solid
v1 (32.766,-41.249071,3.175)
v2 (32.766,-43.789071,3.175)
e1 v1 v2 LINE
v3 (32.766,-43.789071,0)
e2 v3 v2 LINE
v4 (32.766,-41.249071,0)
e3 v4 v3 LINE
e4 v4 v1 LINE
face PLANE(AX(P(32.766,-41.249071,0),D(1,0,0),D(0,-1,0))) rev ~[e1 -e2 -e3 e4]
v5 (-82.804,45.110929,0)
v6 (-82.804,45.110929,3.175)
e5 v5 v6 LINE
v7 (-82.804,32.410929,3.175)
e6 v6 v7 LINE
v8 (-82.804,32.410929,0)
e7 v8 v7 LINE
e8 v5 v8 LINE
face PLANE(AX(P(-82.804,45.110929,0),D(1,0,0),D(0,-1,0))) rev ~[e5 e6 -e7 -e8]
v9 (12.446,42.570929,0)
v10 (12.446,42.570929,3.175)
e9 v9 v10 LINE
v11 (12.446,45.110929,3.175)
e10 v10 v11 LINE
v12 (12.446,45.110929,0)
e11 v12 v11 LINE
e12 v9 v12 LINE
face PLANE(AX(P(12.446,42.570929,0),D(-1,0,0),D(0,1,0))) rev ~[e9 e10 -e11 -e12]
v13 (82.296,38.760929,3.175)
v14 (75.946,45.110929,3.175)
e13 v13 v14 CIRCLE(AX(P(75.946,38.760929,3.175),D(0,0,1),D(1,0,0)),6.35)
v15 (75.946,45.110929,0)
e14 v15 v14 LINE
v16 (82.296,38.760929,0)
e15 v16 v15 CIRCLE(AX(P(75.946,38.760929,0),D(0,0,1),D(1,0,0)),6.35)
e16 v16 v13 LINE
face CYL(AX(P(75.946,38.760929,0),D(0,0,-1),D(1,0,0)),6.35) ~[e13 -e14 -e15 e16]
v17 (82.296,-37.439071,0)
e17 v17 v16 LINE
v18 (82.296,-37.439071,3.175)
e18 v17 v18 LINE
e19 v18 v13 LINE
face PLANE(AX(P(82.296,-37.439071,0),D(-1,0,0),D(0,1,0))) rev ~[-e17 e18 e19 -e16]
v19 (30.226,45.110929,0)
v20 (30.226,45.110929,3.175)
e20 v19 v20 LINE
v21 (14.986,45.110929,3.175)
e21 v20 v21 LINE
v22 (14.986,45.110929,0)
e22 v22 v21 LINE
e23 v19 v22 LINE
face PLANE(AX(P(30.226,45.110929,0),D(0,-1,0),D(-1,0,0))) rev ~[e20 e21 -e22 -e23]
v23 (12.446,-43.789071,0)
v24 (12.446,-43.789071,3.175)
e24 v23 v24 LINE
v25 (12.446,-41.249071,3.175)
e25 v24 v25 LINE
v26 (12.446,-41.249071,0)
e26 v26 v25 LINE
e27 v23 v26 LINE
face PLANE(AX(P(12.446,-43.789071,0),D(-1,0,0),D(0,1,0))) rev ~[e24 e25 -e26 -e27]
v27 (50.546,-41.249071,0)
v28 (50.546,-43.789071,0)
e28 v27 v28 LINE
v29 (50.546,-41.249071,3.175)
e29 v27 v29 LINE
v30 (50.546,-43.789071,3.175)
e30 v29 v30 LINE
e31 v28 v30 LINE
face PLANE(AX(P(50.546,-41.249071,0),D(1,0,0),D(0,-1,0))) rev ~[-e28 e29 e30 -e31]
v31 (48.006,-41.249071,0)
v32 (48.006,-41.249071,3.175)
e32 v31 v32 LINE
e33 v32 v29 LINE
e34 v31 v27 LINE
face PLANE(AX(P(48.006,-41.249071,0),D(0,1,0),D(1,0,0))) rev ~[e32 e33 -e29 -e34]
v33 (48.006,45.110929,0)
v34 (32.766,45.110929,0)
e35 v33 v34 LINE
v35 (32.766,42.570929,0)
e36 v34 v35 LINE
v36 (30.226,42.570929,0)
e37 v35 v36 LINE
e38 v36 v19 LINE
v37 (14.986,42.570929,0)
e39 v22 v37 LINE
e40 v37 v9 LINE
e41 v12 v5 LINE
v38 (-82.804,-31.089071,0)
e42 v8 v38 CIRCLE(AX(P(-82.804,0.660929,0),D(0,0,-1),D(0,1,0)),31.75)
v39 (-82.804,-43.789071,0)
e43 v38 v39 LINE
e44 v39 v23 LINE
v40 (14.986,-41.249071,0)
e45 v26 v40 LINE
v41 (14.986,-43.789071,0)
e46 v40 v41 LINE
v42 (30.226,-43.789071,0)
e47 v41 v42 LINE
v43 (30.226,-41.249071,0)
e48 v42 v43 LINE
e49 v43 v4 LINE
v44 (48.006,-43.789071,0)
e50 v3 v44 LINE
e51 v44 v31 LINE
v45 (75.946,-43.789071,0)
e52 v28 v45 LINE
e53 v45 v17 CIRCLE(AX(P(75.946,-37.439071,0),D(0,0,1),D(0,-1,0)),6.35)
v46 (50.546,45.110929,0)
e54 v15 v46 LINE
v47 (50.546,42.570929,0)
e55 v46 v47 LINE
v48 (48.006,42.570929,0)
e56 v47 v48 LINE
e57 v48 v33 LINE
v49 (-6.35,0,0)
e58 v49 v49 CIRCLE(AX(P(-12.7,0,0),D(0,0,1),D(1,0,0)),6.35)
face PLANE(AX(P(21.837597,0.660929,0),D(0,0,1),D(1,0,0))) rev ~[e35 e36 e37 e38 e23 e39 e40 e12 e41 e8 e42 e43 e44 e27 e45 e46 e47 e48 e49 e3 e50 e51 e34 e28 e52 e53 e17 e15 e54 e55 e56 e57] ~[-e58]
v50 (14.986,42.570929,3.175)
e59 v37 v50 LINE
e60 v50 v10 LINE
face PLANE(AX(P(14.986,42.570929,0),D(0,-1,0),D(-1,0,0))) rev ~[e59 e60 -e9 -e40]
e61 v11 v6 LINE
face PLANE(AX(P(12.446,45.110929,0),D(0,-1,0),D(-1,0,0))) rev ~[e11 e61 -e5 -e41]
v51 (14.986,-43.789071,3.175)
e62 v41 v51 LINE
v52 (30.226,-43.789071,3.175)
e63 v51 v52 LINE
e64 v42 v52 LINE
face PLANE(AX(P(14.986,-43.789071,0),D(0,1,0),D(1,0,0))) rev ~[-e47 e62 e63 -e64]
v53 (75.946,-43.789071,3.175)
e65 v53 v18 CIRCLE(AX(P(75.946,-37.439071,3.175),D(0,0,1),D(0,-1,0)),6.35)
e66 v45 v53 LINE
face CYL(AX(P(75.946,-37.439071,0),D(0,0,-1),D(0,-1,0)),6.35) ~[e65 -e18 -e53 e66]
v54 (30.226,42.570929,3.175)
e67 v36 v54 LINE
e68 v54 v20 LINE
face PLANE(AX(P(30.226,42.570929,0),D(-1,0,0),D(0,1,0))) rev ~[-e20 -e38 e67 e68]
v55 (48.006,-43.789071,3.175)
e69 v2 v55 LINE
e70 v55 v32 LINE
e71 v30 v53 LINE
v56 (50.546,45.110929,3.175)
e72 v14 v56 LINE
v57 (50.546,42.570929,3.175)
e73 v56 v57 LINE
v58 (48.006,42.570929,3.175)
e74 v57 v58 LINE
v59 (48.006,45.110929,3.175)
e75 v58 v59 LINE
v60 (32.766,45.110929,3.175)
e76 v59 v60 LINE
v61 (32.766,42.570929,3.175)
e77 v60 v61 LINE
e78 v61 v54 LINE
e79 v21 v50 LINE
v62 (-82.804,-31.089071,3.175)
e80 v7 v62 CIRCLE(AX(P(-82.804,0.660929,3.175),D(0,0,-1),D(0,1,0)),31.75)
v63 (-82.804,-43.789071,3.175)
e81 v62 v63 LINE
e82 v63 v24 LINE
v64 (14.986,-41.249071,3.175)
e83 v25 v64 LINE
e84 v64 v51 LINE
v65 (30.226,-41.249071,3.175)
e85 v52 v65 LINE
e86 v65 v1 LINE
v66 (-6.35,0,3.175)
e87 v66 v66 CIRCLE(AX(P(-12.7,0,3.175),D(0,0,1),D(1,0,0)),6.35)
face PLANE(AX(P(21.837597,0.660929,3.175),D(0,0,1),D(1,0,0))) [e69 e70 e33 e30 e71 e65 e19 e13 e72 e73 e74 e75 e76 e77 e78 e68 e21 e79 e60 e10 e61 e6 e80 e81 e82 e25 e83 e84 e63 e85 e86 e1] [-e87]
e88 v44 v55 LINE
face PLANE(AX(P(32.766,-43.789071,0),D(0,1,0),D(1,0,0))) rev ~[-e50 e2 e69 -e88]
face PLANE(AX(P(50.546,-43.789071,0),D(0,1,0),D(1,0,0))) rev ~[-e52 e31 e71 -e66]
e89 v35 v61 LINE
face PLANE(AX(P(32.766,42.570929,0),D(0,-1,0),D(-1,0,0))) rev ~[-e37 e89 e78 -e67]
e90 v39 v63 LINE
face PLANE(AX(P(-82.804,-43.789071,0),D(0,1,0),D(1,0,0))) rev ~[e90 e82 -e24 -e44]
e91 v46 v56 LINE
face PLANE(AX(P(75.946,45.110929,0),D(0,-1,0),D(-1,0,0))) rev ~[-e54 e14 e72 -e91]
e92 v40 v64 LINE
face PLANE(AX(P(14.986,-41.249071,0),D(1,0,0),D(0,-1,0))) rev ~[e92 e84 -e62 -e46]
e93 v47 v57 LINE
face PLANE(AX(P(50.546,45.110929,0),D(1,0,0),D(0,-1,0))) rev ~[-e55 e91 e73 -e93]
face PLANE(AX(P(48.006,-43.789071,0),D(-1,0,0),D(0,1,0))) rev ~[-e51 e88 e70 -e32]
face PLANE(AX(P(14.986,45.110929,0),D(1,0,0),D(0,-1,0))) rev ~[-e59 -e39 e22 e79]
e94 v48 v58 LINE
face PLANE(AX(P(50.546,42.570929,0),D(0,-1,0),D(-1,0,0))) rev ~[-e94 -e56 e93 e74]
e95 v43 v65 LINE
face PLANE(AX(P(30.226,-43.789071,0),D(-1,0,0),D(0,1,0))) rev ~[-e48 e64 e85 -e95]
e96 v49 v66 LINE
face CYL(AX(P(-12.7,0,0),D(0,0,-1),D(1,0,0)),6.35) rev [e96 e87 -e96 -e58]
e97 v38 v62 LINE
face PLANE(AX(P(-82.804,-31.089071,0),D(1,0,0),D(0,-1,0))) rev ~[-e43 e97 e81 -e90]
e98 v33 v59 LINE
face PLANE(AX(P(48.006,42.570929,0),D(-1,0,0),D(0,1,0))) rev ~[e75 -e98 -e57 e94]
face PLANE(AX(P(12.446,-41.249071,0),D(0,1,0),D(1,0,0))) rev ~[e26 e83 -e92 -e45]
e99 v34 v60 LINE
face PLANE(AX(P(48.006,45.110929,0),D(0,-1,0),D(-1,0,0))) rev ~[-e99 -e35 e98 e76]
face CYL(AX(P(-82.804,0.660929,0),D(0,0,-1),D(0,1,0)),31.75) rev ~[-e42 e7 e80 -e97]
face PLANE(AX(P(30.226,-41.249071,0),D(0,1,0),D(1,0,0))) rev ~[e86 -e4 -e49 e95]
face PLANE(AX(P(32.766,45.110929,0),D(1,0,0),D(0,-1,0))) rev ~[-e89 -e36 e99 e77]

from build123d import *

# Parameters (mm, degrees)
F0_R     = 6.35
F1_DEPTH = 3.175


# Not quite as in the source:
# - a feature names something its author has since deleted; it is built from what else it names


with BuildPart() as f1:
    # F0 (on Top) → F1 (new body)
    with BuildSketch(Plane.XY):
        with BuildLine():
            Line((50.546, -43.7890713215), (75.946, -43.7890713215))
            ThreePointArc((75.946, -43.7890713215), (80.4361280605, -41.929199382), (82.296, -37.4390713215))
            Line((82.296, -37.4390713215), (82.296, 38.7609286785))
            ThreePointArc((82.296, 38.7609286785), (80.4361280605, 43.251056739), (75.946, 45.1109286785))
            Line((75.946, 45.1109286785), (50.546, 45.1109286785))
            Line((50.546, 45.1109286785), (50.546, 42.5709286785))
            Line((50.546, 42.5709286785), (48.006, 42.5709286785))
            Line((48.006, 42.5709286785), (48.006, 45.1109286785))
            Line((48.006, 45.1109286785), (32.766, 45.1109286785))
            Line((32.766, 45.1109286785), (32.766, 42.5709286785))
            Line((32.766, 42.5709286785), (30.226, 42.5709286785))
            Line((30.226, 42.5709286785), (30.226, 45.1109286785))
            Line((30.226, 45.1109286785), (14.986, 45.1109286785))
            Line((14.986, 45.1109286785), (14.986, 42.5709286785))
            Line((14.986, 42.5709286785), (12.446, 42.5709286785))
            Line((12.446, 42.5709286785), (12.446, 45.1109286785))
            Line((12.446, 45.1109286785), (-38.354, 45.1109286785))
            Line((-38.354, 45.1109286785), (-38.354, -43.7890713215))
            Line((-38.354, -43.7890713215), (12.446, -43.7890713215))
            Line((12.446, -43.7890713215), (12.446, -41.2490713215))
            Line((12.446, -41.2490713215), (14.986, -41.2490713215))
            Line((14.986, -41.2490713215), (14.986, -43.7890713215))
            Line((14.986, -43.7890713215), (30.226, -43.7890713215))
            Line((30.226, -43.7890713215), (30.226, -41.2490713215))
            Line((30.226, -41.2490713215), (32.766, -41.2490713215))
            Line((32.766, -41.2490713215), (32.766, -43.7890713215))
            Line((32.766, -43.7890713215), (48.006, -43.7890713215))
            Line((48.006, -43.7890713215), (48.006, -41.2490713215))
            Line((48.006, -41.2490713215), (50.546, -41.2490713215))
            Line((50.546, -41.2490713215), (50.546, -43.7890713215))
        make_face()
        with Locations((-12.7, 0)):
            Circle(F0_R, mode=Mode.SUBTRACT)
        with BuildLine():
            Line((-82.804, -43.7890713215), (-38.354, -43.7890713215))
            Line((-38.354, -43.7890713215), (-38.354, 45.1109286785))
            Line((-38.354, 45.1109286785), (-82.804, 45.1109286785))
            Line((-82.804, 45.1109286785), (-82.804, 32.4109286785))
            ThreePointArc((-82.804, 32.4109286785), (-51.054, 0.6609286785), (-82.804, -31.0890713215))
            Line((-82.804, -31.0890713215), (-82.804, -43.7890713215))
        make_face()
    extrude(amount=F1_DEPTH)


solid = f1.part
